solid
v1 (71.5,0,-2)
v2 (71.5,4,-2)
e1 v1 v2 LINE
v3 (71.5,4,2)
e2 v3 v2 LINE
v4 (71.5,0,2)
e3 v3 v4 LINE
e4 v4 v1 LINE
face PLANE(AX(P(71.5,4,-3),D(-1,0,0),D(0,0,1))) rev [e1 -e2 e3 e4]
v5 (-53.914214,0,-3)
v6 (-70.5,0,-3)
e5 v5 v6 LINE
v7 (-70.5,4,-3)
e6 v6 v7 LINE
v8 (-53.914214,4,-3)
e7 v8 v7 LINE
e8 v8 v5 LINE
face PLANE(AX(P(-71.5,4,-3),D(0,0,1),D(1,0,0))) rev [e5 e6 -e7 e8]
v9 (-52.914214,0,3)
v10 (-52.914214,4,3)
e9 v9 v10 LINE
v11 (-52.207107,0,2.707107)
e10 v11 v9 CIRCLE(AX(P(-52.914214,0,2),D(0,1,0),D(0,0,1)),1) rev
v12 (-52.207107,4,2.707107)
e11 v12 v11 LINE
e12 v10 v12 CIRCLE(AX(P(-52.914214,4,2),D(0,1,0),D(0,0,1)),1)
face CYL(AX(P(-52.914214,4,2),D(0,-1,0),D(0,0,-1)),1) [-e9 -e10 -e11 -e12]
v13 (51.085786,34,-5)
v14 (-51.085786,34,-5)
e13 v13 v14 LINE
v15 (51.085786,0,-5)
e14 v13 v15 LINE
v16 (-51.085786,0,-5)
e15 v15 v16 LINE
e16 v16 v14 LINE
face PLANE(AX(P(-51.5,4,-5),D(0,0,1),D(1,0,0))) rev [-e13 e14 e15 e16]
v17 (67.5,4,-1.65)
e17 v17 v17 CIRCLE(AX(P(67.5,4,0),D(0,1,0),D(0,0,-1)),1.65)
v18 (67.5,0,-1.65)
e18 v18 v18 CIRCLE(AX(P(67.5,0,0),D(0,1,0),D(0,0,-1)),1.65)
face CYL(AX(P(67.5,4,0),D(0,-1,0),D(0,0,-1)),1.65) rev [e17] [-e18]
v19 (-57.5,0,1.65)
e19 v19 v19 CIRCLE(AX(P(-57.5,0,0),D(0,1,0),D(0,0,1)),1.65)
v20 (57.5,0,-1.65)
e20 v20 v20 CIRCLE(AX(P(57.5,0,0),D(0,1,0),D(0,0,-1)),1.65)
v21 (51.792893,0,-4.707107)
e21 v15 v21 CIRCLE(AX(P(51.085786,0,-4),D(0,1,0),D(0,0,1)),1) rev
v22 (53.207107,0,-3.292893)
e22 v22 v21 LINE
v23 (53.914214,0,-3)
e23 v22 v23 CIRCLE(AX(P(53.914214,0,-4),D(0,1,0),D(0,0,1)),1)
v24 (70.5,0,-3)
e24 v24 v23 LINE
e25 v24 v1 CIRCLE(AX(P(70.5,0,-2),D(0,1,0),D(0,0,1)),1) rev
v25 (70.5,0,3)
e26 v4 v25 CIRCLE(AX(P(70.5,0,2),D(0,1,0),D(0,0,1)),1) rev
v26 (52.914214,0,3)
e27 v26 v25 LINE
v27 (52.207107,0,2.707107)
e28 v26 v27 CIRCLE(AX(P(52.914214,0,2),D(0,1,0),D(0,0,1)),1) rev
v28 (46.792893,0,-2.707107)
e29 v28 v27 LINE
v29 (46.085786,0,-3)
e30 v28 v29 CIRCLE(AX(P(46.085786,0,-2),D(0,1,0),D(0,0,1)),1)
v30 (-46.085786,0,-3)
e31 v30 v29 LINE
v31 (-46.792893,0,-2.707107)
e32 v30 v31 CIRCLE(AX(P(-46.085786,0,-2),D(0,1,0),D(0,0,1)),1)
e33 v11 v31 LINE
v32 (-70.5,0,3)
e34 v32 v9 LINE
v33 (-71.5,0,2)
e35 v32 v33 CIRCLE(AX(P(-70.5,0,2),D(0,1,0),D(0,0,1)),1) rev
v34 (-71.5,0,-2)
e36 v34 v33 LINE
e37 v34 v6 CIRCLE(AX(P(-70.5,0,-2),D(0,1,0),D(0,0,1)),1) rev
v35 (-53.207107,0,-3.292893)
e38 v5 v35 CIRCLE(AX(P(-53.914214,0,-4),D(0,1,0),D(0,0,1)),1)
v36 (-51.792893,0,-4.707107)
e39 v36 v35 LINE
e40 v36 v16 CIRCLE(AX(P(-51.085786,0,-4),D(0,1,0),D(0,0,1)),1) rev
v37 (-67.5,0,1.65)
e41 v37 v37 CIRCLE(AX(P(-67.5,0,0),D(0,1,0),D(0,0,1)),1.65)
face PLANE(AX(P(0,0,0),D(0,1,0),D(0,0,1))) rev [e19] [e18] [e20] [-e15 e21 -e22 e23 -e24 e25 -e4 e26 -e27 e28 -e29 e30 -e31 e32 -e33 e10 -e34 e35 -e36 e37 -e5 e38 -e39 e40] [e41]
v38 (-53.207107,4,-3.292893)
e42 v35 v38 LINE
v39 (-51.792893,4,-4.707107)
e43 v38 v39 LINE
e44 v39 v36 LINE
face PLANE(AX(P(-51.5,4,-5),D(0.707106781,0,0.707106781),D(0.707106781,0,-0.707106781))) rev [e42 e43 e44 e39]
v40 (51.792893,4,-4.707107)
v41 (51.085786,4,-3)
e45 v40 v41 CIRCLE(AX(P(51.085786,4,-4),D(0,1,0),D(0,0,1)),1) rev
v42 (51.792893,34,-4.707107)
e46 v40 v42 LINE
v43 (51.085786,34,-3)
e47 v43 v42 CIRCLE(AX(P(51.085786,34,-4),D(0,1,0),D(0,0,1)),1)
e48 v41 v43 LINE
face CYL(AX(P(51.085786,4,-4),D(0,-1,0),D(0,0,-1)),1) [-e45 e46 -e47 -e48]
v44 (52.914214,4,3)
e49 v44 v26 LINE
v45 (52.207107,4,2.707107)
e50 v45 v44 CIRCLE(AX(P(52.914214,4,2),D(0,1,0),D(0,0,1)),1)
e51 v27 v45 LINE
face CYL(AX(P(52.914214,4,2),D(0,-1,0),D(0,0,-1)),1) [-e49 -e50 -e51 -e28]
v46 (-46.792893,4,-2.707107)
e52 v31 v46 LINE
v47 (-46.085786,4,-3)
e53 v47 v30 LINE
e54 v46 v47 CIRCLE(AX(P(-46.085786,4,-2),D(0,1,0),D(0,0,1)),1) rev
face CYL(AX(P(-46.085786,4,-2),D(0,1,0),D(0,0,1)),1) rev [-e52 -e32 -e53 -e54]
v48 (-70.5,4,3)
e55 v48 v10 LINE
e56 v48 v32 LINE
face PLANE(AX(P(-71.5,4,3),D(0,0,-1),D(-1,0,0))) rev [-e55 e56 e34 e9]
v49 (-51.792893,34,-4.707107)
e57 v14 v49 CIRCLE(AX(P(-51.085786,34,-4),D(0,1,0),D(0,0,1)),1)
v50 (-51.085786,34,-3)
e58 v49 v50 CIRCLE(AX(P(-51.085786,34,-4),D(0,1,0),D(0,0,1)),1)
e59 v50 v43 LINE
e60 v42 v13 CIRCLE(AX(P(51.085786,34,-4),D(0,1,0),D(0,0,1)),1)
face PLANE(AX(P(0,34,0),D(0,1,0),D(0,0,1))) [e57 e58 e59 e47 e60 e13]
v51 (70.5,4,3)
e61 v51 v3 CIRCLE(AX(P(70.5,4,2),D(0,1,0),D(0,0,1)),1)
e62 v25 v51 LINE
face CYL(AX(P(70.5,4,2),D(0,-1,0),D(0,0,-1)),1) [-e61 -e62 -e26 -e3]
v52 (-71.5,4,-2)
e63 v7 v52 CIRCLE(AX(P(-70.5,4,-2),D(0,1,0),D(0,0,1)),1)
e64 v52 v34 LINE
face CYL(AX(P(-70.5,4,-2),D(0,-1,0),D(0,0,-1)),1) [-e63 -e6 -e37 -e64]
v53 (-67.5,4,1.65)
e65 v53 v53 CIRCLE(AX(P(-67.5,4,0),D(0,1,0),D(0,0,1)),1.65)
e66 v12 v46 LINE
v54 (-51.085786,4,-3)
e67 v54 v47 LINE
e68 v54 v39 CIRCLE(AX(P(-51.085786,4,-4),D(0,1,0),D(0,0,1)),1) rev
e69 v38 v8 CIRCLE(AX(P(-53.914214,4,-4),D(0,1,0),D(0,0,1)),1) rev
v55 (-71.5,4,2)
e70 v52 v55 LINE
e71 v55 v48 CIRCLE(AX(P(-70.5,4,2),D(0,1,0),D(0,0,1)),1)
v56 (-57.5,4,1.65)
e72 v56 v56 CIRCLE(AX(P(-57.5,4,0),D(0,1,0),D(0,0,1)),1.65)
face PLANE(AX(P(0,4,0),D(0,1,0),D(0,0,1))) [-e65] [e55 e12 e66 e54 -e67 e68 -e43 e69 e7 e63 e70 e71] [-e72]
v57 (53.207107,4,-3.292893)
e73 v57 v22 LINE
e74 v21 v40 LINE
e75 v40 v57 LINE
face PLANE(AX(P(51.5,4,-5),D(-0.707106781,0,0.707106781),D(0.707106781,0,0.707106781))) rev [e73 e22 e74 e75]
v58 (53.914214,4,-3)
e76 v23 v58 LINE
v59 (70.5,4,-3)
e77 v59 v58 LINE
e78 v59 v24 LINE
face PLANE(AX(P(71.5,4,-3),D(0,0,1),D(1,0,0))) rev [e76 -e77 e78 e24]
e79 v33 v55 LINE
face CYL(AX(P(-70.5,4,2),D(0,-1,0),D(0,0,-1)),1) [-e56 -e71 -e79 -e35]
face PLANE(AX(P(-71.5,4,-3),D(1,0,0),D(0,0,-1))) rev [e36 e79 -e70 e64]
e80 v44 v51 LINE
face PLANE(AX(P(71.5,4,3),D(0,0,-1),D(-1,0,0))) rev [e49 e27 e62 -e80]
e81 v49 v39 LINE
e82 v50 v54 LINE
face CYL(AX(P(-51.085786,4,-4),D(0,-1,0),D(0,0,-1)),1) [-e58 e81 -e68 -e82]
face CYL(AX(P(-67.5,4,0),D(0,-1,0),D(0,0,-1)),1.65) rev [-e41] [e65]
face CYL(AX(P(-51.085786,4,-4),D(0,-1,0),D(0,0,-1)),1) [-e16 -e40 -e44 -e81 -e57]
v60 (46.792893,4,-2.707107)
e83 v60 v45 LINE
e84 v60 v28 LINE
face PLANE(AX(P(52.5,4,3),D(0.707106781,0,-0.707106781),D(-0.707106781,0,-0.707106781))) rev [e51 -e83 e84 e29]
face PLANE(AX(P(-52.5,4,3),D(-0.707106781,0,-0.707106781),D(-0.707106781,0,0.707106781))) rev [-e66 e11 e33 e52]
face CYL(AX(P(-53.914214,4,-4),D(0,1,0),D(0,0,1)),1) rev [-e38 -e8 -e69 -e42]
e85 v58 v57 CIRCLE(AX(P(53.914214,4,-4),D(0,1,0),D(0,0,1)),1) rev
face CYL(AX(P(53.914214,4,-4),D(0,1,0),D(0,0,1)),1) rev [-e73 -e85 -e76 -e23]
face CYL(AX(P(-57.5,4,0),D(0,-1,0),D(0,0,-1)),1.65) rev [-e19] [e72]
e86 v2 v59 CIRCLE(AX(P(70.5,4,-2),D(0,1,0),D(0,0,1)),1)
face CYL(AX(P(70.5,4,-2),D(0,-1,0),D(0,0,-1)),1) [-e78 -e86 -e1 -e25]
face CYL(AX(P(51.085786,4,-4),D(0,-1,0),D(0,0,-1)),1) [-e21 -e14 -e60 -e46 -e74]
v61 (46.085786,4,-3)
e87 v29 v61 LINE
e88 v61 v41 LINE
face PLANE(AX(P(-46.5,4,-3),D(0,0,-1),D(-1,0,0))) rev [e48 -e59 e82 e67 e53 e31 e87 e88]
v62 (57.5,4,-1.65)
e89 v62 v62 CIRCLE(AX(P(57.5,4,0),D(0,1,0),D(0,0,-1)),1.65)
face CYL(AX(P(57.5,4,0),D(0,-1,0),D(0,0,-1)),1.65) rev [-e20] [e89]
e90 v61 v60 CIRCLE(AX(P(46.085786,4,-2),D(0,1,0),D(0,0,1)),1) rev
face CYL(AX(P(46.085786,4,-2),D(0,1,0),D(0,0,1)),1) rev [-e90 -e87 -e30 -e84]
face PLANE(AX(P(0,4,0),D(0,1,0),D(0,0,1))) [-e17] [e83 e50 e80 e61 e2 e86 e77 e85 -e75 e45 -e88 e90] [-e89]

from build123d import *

# Parameters (mm, degrees)
SKETCH_1_R      = 1.65
EXTRUDE_1_DEPTH = 4
EXTRUDE_2_DEPTH = 30
FILLET_1_R      = 1
FILLET_2_R      = 1


with BuildPart() as part:
    # 草图1 → 凸台-拉伸1 (new body)
    with BuildSketch(Plane(origin=(0, 0, 0), x_dir=(1, 0, 0), z_dir=(0, 1, 0))):
        Polygon((-71.5, 3), (-71.5, -3), (-52.5, -3), (-46.5, 3), (46.5, 3), (52.5, -3), (71.5, -3), (71.5, 3), (53.5, 3), (51.5, 5), (-51.5, 5), (-53.5, 3), align=None)
        with Locations(Location((-57.5, 0, 0), (0, 0, 270))):
            Circle(SKETCH_1_R, mode=Mode.SUBTRACT)
        with Locations(Location((-67.5, 0, 0), (0, 0, 270))):
            Circle(SKETCH_1_R, mode=Mode.SUBTRACT)
        with Locations(Location((67.5, 0, 0), (0, 0, 90))):
            Circle(SKETCH_1_R, mode=Mode.SUBTRACT)
        with Locations(Location((57.5, 0, 0), (0, 0, 90))):
            Circle(SKETCH_1_R, mode=Mode.SUBTRACT)
    extrude(amount=EXTRUDE_1_DEPTH)

    # 草图2 → 凸台-拉伸2 (add)
    with BuildSketch(Plane(origin=(0, 4, 0), x_dir=(1, 0, 0), z_dir=(0, 1, 0))):
        Polygon((-51.5, 5), (-53.5, 3), (53.5, 3), (51.5, 5), align=None)
    extrude(amount=EXTRUDE_2_DEPTH)

    # 圆角1
    fillet_1_edges = [part.edges().sort_by_distance(p)[0] for p in [
        (51.5, 17, -5),
        (-51.5, 17, -5),
        (-71.5, 2, -3),
        (-71.5, 2, 3),
        (-46.5, 2, -3),
        (46.5, 2, -3),
        (52.5, 2, 3),
        (71.5, 2, 3),
        (71.5, 2, -3),
        (-52.5, 2, 3),
        (-53.5, 19, -3),
        (53.5, 19, -3),
    ]]
    fillet(fillet_1_edges, radius=FILLET_1_R - 0.0001)  # a hair under: the kernel refuses the full size

    # 圆角2
    fillet_2_edges = [part.edges().sort_by_distance(p)[0] for p in [
        (53.5, 2, -3),
        (-53.5, 2, -3),
    ]]
    fillet(fillet_2_edges, radius=FILLET_2_R)


solid = part.part
